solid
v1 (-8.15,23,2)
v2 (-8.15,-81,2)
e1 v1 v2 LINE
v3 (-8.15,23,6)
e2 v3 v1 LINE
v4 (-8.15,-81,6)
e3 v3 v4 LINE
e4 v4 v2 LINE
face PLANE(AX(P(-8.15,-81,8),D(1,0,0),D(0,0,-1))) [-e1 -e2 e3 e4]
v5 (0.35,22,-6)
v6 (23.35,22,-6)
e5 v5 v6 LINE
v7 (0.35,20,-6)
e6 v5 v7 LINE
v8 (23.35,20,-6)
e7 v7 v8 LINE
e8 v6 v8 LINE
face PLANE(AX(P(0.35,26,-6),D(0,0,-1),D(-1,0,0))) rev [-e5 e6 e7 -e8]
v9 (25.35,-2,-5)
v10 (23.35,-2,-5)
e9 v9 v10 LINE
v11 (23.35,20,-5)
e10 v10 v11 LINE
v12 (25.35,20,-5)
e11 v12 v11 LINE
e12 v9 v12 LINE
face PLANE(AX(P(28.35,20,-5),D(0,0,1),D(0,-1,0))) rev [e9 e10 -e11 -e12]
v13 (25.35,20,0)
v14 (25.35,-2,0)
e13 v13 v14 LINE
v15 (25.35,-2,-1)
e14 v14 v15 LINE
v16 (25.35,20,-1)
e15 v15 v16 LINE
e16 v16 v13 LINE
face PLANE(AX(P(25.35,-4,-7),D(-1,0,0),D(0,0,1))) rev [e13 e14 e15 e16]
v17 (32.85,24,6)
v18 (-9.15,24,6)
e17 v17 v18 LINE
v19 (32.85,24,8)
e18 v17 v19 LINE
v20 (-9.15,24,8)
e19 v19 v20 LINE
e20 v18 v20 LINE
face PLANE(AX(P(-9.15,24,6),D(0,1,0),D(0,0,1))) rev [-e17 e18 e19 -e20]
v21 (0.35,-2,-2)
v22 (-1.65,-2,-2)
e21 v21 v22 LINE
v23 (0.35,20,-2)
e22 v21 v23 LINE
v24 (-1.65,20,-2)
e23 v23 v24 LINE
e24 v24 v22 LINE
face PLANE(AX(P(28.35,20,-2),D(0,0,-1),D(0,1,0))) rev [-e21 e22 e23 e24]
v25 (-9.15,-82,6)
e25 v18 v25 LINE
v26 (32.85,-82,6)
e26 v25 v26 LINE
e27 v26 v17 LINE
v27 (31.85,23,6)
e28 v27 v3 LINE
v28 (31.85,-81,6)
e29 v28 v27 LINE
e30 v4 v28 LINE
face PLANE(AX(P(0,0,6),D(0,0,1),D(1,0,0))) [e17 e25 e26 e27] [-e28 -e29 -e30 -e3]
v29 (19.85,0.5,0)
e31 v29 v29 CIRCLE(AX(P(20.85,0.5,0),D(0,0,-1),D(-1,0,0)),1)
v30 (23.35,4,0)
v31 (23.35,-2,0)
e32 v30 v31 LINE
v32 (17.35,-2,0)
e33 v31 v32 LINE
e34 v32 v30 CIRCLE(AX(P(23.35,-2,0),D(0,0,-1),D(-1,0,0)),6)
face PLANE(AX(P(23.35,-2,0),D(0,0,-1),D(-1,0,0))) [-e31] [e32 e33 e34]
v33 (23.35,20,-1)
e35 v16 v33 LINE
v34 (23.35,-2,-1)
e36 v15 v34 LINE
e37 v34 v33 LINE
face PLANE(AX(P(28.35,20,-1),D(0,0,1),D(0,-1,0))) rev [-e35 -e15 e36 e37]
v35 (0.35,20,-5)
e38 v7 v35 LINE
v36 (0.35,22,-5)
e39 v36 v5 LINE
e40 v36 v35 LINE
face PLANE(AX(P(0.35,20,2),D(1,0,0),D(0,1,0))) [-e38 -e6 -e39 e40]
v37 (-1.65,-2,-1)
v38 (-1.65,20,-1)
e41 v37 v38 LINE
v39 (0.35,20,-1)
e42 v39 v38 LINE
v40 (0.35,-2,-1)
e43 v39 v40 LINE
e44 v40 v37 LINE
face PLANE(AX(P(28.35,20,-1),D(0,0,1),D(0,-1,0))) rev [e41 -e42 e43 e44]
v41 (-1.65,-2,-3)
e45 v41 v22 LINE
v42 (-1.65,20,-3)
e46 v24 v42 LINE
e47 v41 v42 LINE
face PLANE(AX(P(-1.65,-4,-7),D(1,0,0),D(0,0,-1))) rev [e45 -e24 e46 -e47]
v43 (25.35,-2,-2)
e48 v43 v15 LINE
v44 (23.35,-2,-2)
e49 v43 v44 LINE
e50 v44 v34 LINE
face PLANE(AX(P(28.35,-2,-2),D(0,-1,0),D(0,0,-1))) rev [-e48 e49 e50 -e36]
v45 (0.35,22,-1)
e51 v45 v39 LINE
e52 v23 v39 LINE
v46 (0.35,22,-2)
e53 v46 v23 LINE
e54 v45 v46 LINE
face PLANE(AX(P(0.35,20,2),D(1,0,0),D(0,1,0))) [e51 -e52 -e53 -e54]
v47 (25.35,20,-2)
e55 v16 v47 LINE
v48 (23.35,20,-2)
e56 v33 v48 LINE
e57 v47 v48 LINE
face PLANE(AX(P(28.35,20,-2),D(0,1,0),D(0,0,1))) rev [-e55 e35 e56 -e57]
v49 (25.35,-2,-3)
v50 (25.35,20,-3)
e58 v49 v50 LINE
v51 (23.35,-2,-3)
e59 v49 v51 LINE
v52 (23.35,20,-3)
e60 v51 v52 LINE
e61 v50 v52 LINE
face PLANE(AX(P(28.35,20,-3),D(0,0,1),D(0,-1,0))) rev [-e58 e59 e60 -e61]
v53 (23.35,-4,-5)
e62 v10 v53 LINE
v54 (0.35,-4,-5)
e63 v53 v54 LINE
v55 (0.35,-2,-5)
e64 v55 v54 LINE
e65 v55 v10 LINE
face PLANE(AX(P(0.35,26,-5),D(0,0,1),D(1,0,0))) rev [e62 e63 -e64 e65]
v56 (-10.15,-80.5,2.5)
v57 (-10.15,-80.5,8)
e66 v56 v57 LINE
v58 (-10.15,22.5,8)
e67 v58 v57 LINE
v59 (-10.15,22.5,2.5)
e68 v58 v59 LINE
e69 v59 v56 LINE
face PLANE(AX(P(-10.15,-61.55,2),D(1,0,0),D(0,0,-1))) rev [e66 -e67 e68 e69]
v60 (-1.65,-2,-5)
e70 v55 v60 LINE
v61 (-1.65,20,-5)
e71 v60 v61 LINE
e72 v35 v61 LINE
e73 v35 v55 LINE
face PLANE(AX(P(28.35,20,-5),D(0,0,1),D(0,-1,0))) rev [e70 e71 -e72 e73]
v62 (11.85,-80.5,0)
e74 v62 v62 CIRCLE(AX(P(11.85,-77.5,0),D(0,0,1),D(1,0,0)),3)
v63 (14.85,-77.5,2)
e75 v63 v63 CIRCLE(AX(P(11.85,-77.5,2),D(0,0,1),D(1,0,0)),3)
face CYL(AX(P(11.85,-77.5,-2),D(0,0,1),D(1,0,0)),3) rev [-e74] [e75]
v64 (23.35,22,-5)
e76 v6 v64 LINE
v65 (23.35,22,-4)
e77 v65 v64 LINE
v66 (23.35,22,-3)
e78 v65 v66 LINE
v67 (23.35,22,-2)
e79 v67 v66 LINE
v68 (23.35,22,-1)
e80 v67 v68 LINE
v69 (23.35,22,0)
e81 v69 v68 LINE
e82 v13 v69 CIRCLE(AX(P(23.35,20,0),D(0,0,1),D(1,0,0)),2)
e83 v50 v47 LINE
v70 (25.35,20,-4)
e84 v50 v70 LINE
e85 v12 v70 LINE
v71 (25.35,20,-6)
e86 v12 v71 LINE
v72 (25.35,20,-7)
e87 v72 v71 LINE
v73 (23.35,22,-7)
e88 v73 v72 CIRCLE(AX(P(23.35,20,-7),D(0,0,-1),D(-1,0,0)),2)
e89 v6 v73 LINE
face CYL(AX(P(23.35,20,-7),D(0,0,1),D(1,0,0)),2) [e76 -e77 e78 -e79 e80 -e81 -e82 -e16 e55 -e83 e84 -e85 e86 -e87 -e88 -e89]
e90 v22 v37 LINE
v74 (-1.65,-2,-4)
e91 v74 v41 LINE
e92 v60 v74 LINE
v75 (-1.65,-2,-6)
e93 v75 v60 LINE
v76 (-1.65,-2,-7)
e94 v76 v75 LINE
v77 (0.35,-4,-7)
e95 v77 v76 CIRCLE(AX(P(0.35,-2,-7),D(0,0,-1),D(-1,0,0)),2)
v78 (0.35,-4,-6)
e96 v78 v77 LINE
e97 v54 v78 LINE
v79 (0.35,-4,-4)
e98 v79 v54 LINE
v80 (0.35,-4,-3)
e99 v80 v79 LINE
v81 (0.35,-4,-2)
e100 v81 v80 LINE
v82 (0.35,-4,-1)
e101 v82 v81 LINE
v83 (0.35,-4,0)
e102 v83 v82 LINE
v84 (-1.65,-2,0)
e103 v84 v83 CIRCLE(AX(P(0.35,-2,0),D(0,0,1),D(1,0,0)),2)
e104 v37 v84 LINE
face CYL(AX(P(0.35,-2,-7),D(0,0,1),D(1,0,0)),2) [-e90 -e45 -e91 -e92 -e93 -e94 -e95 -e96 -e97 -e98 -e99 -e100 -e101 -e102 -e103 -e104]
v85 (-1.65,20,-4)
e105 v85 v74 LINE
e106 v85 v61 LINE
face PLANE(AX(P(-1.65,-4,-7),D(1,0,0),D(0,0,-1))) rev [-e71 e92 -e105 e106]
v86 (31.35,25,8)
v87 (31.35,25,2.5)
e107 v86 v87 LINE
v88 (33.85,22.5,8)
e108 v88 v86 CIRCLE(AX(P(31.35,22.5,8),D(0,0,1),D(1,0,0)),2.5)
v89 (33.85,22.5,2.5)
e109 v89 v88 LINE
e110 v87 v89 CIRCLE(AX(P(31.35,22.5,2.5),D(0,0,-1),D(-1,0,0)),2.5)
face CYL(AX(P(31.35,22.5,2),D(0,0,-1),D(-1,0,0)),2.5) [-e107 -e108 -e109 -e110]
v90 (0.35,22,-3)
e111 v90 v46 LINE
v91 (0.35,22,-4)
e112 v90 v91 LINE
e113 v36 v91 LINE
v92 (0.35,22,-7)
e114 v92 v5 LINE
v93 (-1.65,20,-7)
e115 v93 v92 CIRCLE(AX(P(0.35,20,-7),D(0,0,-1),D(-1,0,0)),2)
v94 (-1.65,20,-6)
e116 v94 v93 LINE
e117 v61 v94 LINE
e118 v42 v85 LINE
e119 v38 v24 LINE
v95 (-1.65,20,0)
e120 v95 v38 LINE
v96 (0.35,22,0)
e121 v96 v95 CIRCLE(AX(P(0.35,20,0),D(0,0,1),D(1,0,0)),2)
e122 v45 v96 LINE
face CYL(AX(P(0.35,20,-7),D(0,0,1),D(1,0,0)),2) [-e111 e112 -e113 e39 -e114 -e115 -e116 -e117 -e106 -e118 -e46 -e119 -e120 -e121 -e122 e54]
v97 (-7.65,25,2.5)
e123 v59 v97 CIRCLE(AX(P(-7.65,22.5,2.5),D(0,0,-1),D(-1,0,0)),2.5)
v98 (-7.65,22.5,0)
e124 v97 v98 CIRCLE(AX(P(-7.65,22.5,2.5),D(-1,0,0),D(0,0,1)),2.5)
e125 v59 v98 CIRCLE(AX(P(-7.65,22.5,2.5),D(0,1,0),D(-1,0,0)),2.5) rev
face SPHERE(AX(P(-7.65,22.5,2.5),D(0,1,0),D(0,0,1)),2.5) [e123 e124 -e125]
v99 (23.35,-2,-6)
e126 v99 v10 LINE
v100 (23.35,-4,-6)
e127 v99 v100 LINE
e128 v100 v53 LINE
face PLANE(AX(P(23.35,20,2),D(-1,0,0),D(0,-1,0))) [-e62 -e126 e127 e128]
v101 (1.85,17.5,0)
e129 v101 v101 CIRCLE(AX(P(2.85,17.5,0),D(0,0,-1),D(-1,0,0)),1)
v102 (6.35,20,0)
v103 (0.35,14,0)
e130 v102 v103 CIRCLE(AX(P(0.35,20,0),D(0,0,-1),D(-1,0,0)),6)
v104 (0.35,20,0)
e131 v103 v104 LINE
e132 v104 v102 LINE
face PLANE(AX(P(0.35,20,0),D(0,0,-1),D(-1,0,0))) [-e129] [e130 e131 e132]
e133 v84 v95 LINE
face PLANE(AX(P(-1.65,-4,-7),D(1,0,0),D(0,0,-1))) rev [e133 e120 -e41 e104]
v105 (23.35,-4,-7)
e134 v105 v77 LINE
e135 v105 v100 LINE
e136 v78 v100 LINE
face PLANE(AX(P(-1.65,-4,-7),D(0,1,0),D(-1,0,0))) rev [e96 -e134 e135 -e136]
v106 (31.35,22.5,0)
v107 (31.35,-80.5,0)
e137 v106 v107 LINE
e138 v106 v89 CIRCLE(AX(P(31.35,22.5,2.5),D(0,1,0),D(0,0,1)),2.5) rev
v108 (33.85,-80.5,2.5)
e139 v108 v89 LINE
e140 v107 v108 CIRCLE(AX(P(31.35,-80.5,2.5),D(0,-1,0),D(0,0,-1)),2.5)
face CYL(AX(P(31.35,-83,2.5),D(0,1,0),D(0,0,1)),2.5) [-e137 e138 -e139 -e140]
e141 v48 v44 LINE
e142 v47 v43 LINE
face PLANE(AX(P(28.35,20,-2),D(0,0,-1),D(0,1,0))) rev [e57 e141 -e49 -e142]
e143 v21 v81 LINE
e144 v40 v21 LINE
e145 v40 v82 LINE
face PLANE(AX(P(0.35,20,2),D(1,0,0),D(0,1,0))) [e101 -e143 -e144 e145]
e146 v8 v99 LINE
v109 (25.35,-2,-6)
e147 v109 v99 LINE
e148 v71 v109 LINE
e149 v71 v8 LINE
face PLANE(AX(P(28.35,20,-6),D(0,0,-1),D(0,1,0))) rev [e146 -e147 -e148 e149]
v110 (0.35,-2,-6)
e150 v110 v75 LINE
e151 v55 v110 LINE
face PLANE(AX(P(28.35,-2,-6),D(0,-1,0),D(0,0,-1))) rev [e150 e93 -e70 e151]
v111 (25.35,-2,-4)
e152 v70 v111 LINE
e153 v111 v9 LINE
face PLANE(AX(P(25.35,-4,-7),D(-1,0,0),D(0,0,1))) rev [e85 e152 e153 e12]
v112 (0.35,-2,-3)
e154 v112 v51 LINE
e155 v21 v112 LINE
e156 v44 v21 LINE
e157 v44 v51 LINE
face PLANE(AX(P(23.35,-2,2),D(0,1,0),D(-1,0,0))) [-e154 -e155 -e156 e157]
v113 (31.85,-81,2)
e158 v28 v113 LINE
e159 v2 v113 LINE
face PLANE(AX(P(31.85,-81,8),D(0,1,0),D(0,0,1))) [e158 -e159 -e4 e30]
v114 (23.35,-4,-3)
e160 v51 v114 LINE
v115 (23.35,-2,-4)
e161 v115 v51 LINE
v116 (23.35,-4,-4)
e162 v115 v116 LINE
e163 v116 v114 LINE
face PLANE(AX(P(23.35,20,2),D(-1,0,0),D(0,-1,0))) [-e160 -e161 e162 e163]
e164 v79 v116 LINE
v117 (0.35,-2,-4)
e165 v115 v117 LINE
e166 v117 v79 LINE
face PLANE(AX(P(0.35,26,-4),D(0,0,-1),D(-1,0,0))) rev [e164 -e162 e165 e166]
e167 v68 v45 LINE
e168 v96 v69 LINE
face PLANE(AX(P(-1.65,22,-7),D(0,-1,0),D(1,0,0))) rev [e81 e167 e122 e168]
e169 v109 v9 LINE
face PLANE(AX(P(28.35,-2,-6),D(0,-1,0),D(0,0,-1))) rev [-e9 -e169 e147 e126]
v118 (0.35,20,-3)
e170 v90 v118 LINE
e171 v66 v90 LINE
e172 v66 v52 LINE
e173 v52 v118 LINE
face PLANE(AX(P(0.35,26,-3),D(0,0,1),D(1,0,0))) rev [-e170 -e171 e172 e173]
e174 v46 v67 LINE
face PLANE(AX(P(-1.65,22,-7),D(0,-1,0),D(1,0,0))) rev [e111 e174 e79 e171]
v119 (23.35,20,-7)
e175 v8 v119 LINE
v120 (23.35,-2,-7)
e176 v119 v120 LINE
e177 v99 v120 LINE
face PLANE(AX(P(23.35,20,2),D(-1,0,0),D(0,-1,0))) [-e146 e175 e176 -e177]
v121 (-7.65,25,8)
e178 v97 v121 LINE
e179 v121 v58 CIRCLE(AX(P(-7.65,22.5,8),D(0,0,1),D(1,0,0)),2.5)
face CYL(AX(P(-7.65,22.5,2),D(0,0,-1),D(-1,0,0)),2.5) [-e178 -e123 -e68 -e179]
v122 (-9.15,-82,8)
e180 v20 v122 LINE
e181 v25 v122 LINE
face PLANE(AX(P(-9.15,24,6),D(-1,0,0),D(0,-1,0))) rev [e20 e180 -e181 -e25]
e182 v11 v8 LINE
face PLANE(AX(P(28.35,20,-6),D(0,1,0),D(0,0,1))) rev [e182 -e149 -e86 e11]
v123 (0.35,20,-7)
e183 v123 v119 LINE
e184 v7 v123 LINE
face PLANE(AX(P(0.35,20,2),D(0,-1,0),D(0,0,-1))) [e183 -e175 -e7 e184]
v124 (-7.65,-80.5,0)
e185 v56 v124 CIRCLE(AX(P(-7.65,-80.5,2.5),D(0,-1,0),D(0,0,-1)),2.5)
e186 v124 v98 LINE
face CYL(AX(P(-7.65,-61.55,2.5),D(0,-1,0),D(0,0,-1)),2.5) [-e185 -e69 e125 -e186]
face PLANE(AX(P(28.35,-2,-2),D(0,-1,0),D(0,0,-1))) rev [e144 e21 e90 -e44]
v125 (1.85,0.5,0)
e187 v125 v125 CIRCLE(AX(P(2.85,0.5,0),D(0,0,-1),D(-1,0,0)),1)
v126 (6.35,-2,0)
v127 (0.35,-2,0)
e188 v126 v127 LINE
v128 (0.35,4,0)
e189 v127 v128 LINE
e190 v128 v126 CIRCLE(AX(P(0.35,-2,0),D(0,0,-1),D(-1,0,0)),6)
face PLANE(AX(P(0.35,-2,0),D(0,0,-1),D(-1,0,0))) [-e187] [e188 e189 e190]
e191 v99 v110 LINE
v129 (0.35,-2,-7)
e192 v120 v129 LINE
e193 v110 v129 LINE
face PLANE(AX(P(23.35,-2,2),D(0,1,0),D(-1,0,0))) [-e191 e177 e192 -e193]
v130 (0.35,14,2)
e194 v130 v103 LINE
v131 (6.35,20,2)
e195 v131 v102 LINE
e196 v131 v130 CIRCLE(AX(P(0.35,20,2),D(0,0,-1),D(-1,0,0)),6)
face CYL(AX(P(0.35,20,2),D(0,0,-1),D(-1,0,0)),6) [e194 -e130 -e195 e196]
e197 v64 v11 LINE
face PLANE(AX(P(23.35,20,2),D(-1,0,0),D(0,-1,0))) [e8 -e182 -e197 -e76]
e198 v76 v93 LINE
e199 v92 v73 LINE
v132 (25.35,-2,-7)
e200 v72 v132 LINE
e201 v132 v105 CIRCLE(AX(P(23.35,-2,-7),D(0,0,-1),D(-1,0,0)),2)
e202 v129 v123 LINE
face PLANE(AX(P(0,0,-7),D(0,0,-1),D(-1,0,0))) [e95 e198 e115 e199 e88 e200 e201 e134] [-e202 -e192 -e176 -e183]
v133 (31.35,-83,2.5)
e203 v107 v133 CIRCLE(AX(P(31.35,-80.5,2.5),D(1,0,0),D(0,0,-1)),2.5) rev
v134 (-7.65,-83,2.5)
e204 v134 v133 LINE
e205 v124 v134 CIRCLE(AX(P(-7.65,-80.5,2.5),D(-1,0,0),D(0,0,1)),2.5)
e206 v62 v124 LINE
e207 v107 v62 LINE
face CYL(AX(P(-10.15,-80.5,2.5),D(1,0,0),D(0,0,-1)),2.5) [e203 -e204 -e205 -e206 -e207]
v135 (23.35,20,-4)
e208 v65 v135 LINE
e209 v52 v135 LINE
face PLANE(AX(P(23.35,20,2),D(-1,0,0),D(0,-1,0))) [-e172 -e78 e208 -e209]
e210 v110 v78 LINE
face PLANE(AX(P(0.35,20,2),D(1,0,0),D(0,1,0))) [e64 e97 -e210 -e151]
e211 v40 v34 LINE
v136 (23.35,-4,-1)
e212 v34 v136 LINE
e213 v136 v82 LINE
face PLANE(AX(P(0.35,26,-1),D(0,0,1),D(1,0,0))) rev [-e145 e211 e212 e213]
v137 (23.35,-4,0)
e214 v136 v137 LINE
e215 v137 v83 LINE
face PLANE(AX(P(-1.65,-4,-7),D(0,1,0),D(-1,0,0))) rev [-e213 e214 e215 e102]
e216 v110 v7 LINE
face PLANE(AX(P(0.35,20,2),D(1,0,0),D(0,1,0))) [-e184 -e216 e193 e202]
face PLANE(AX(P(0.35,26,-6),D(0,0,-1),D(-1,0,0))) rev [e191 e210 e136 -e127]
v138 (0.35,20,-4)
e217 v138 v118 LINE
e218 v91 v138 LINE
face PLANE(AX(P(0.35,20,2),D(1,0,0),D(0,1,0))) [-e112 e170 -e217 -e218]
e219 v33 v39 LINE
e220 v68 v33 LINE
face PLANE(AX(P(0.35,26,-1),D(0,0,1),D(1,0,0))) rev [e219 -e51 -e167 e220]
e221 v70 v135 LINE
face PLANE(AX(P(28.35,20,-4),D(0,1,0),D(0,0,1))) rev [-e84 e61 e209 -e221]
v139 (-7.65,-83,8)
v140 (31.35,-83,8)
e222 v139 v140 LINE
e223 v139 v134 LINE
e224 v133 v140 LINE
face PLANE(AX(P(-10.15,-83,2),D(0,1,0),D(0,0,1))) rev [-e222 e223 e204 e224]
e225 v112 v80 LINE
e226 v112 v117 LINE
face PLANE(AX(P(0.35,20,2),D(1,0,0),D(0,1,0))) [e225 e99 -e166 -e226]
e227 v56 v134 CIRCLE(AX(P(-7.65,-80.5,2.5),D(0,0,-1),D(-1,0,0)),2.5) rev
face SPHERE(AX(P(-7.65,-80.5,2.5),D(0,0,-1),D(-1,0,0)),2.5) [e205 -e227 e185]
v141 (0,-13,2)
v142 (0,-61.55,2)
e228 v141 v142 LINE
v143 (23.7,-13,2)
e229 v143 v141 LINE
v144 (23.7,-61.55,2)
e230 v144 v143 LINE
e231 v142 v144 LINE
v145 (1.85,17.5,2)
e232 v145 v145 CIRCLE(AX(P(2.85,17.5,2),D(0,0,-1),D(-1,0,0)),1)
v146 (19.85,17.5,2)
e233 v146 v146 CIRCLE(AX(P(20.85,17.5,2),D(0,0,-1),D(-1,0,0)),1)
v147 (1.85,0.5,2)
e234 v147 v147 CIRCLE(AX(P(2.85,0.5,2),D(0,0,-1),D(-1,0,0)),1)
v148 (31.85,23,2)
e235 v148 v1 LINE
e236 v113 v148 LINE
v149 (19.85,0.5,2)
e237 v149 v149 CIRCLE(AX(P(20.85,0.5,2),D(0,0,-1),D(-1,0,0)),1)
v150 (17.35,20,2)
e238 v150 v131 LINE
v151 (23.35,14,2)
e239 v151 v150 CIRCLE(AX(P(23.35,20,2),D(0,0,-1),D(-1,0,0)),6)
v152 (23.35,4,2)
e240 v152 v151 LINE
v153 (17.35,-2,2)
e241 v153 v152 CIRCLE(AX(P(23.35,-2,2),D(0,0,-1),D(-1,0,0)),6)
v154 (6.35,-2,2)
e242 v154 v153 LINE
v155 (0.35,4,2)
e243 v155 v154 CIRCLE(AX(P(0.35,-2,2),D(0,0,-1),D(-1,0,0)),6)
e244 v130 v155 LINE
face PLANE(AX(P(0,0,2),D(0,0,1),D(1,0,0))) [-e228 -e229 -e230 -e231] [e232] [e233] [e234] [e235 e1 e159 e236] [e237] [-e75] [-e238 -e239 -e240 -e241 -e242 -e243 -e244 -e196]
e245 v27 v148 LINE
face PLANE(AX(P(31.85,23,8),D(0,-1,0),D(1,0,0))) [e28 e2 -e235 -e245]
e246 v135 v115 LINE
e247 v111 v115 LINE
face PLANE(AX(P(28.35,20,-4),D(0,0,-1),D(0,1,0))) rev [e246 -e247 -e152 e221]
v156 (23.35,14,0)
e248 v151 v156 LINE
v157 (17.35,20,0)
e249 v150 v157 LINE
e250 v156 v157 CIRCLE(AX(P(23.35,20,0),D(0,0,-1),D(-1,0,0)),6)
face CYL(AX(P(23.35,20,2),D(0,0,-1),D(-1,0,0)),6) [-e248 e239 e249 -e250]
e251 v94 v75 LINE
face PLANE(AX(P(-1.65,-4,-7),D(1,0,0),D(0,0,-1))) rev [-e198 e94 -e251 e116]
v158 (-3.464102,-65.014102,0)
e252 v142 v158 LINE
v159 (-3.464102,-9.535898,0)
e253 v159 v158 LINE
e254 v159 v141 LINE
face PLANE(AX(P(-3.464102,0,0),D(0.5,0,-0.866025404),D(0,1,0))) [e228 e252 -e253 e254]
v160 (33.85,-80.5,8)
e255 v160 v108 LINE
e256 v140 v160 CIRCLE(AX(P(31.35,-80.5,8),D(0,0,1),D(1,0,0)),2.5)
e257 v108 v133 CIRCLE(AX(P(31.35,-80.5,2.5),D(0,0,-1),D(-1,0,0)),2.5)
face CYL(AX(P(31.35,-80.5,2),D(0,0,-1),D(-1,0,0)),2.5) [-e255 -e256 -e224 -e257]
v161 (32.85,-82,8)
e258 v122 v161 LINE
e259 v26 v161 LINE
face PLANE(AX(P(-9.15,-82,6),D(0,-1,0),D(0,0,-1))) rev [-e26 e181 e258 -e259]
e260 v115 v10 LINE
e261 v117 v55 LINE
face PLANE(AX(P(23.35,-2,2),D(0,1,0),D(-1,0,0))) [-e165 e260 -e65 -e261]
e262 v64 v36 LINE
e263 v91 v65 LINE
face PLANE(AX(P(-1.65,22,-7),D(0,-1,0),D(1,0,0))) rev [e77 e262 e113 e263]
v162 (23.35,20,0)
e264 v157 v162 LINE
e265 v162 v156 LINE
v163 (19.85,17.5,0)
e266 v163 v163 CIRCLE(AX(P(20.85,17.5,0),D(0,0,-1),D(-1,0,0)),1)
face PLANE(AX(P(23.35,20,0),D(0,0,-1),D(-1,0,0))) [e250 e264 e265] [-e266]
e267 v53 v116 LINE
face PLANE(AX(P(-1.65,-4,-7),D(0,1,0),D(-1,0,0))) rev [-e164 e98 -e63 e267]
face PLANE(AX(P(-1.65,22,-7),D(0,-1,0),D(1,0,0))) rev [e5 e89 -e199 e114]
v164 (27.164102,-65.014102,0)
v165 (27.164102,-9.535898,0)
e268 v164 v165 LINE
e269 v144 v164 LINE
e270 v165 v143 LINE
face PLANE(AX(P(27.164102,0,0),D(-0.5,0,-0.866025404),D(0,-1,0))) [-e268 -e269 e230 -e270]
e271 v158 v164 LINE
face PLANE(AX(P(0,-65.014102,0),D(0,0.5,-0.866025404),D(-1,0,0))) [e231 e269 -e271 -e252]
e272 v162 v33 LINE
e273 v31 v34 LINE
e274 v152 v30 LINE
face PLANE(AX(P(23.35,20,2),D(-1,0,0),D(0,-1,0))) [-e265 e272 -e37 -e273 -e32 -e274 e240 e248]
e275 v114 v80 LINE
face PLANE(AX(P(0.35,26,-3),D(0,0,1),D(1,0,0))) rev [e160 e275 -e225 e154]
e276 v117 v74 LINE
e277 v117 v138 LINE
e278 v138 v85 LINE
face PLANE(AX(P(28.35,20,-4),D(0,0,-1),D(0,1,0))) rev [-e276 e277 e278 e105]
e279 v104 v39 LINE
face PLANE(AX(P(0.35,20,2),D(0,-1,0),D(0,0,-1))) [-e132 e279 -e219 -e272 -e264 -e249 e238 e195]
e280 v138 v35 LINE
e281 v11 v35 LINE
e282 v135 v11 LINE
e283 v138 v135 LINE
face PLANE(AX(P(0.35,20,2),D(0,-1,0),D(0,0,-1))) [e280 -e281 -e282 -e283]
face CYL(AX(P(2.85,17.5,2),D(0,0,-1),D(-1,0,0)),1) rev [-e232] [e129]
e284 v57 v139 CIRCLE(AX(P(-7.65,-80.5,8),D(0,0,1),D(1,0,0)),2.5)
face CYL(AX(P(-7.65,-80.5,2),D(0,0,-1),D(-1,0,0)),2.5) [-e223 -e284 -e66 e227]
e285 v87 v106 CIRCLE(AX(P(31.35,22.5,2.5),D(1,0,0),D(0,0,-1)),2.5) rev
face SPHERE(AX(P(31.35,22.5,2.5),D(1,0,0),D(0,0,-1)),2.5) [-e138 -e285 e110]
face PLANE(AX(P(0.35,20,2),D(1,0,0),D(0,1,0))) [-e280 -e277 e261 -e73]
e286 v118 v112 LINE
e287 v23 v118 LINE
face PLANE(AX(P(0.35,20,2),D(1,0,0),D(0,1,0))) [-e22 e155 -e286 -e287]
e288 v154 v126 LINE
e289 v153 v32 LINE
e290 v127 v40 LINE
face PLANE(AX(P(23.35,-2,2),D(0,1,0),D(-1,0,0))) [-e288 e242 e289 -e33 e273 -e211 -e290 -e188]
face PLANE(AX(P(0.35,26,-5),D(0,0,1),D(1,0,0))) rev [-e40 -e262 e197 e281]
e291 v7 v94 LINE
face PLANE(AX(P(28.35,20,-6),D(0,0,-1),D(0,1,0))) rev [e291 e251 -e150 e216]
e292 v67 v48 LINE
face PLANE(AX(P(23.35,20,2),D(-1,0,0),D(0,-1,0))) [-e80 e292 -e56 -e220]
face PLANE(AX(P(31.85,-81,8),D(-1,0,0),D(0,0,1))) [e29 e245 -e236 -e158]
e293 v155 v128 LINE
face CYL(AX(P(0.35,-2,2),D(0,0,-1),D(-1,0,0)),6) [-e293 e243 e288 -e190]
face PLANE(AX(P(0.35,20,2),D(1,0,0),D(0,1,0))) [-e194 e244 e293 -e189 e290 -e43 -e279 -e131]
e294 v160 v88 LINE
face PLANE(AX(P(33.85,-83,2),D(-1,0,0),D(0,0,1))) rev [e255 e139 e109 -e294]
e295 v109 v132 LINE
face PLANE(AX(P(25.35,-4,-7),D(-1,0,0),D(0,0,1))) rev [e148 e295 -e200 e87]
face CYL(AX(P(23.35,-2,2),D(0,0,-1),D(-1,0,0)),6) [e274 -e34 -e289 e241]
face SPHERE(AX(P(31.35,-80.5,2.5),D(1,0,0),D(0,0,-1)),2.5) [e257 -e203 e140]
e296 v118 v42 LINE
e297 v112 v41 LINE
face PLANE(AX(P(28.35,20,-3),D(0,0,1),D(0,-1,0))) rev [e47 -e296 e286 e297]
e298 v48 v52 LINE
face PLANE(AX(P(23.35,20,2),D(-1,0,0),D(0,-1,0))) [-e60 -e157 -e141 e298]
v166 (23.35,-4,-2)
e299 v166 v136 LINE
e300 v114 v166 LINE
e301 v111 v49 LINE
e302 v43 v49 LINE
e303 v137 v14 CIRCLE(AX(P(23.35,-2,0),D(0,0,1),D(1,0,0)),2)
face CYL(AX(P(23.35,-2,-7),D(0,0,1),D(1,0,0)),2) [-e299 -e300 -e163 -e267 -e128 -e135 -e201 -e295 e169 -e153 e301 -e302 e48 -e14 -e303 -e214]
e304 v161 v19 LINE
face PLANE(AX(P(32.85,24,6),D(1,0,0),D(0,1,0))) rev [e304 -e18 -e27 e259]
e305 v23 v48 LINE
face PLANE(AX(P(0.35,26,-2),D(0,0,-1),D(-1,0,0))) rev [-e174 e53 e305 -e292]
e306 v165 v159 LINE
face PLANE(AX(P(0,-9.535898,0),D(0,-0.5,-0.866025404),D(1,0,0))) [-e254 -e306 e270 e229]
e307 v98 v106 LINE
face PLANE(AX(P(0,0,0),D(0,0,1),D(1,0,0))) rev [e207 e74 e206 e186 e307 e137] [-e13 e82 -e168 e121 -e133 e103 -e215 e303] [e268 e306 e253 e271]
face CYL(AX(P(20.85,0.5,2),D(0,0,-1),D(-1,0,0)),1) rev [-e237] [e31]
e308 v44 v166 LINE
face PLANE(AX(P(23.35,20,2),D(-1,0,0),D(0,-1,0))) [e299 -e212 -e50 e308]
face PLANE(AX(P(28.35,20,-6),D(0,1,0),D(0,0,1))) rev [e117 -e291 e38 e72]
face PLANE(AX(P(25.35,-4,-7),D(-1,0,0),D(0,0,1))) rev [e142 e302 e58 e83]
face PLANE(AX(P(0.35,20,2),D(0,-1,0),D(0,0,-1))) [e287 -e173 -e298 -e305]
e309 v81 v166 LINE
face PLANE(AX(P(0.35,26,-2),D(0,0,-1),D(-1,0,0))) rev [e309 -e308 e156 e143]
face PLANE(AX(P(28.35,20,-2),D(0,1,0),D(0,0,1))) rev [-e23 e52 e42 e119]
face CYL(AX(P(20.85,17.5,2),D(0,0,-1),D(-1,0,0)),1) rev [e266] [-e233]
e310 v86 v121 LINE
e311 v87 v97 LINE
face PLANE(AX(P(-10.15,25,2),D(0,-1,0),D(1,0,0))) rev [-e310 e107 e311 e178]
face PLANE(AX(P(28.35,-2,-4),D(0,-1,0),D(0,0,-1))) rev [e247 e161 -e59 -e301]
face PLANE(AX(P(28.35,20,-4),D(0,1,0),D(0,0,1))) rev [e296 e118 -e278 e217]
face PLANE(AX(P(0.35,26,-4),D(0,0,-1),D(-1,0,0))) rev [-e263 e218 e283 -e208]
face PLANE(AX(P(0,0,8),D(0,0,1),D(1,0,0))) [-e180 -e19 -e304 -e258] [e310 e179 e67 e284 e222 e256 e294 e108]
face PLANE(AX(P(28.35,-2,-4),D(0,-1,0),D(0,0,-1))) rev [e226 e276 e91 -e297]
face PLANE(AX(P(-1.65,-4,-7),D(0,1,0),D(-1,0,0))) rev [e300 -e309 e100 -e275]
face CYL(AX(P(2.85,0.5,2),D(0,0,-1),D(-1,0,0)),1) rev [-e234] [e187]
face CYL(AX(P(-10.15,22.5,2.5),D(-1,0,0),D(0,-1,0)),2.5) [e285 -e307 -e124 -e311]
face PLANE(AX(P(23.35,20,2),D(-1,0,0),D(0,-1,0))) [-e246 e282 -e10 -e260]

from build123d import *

# Parameters (mm, degrees)
SKICA1_W                 = 23.7
SKICA1_H                 = 48.55
SKICA1_W_2               = 23
SKICA1_H_2               = 22
P_IDAT_VYSUNUT_M1_DEPTH  = 2
SKICA3_R                 = 3
ODEBRAT_VYSUNUT_M1_DEPTH = 4
ZKOSEN_1_SIZE            = 3.464101615
ZKOSEN_1_SIZE_2          = 2
SKICA5_W                 = 44
SKICA5_H                 = 108
SKICA5_W_2               = 40
SKICA5_H_2               = 104
P_IDAT_VYSUNUT_M3_DEPTH  = 6
ZAOBLIT2_R               = 2.5
SKICA6_W                 = 27
SKICA6_H                 = 26
SKICA6_W_2               = 23
SKICA6_H_2               = 22
P_IDAT_VYSUNUT_M4_DEPTH  = 7
SKICA7_R                 = 1
P_IDAT_VYSUNUT_M5_DEPTH  = 2
SKICA8_W                 = 23
SKICA8_H                 = 1
ODEBRAT_VYSUNUT_M3_DEPTH = 30
SKICA9_W                 = 1
SKICA9_H                 = 22
ODEBRAT_VYSUNUT_M4_DEPTH = 30
ZAOBLIT3_R               = 2
SKICA10_W                = 42
SKICA10_H                = 106
SKICA10_W_2              = 40
SKICA10_H_2              = 104
ODEBRAT_VYSUNUT_M5_DEPTH = 2


# Some blends are built 0.0001 mm under size
with BuildPart() as part:
    # Skica1 → Přidat vysunutím1 (new body)
    with BuildSketch(Plane.XY):
        Polygon((-10.15, 2), (-10.15, 25), (33.85, 25), (33.85, 2), (33.85, -83), (-10.15, -83), (-10.15, -61.55), align=None)
        with Locations((11.85, -37.275)):
            Rectangle(SKICA1_W, SKICA1_H, mode=Mode.SUBTRACT)
        with Locations((11.85, 9)):
            Rectangle(SKICA1_W_2, SKICA1_H_2, mode=Mode.SUBTRACT)
    extrude(amount=P_IDAT_VYSUNUT_M1_DEPTH)

    # Skica3 → Odebrat vysunutím1 (cut)
    with BuildSketch(Plane.XY.offset(2)):
        with Locations((11.85, -77.5)):
            Circle(SKICA3_R)
    extrude(amount=-ODEBRAT_VYSUNUT_M1_DEPTH, mode=Mode.SUBTRACT)

    # Zkosení1
    # the kernel refuses this chamfer: 3.464101615, 2 mm, written as the material it takes off along each edge
    with BuildSketch(Plane(origin=(0, -13, 0), x_dir=(-0.9998132206222079, 0, -0.019326765612700626), z_dir=(0, -1, 0)), Plane(origin=(23.7, -61.55, 0), x_dir=(0.9998132206222079, 0, -0.019326765612700608), z_dir=(0, 1, 0))) as zkosen_1_piece_1:
        Polygon((ZKOSEN_1_SIZE * 0.999813220662, -ZKOSEN_1_SIZE * 0.0193267656135), (-ZKOSEN_1_SIZE_2 * 0.0193267656127, -ZKOSEN_1_SIZE_2 * 0.999813220622), (0, 0), align=None)
    extrude(amount=48.55, mode=Mode.SUBTRACT)
    with BuildSketch(Plane(origin=(0, -61.55, 0), x_dir=(0, -0.9998132206222079, -0.01932676561270056), z_dir=(1, 0, 0)), Plane(origin=(23.7, -13, 0), x_dir=(0, 0.9998132206222079, -0.019326765612700643), z_dir=(-1, 0, 0))) as zkosen_1_piece_2:
        Polygon((ZKOSEN_1_SIZE * 0.999813220662, -ZKOSEN_1_SIZE * 0.0193267656135), (-ZKOSEN_1_SIZE_2 * 0.0193267656127, -ZKOSEN_1_SIZE_2 * 0.999813220622), (0, 0), align=None)
    extrude(amount=23.7, mode=Mode.SUBTRACT)
    with BuildSketch(Plane(origin=(0, -4.038072059, 0), x_dir=(-0.9998132206222079, 0, -0.019326765612700622), z_dir=(0, -1, 0))) as zkosen_1_piece_3a_section:
        Polygon((ZKOSEN_1_SIZE * 0.999813220662, -ZKOSEN_1_SIZE * 0.0193267656135), (-ZKOSEN_1_SIZE_2 * 0.0193267656127, -ZKOSEN_1_SIZE_2 * 0.999813220622), (0, 0), align=None)
    zkosen_1_piece_3a = extrude(amount=57.511927941, mode=Mode.PRIVATE)
    zkosen_1_piece_3a = split(zkosen_1_piece_3a, bisect_by=Plane(origin=(-1.161798269, -13, 0.64133979), z_dir=(0, 1, 0)), keep=Keep.TOP, mode=Mode.PRIVATE)
    with BuildSketch(Plane(origin=(23.7, -13, 0), x_dir=(0, 0.9998132206222079, -0.019326765612700643), z_dir=(-1, 0, 0))) as zkosen_1_piece_3b_section:
        Polygon((ZKOSEN_1_SIZE * 0.999813220662, -ZKOSEN_1_SIZE * 0.0193267656135), (-ZKOSEN_1_SIZE_2 * 0.0193267656127, -ZKOSEN_1_SIZE_2 * 0.999813220622), (0, 0), align=None)
    zkosen_1_piece_3b = extrude(amount=32.661927941, mode=Mode.PRIVATE)
    zkosen_1_piece_3b = split(zkosen_1_piece_3b, bisect_by=Plane(origin=(0, -11.838201731, 0.64133979), z_dir=(-1, 0, 0)), keep=Keep.TOP, mode=Mode.PRIVATE)
    zkosen_1_piece_3 = zkosen_1_piece_3a & zkosen_1_piece_3b
    add(zkosen_1_piece_3, mode=Mode.SUBTRACT)
    with BuildSketch(Plane(origin=(0, -13, 0), x_dir=(-0.9998132206222079, 0, -0.019326765612700626), z_dir=(0, -1, 0))) as zkosen_1_piece_4a_section:
        Polygon((ZKOSEN_1_SIZE * 0.999813220662, -ZKOSEN_1_SIZE * 0.0193267656135), (-ZKOSEN_1_SIZE_2 * 0.0193267656127, -ZKOSEN_1_SIZE_2 * 0.999813220622), (0, 0), align=None)
    zkosen_1_piece_4a = extrude(amount=57.511927941, mode=Mode.PRIVATE)
    zkosen_1_piece_4a = split(zkosen_1_piece_4a, bisect_by=Plane(origin=(-1.161798269, -61.55, 0.64133979), z_dir=(0, -1, 0)), keep=Keep.TOP, mode=Mode.PRIVATE)
    with BuildSketch(Plane(origin=(-8.961927941, -61.55, 0), x_dir=(0, -0.9998132206222079, -0.01932676561270056), z_dir=(1, 0, 0))) as zkosen_1_piece_4b_section:
        Polygon((ZKOSEN_1_SIZE * 0.999813220662, -ZKOSEN_1_SIZE * 0.0193267656135), (-ZKOSEN_1_SIZE_2 * 0.0193267656127, -ZKOSEN_1_SIZE_2 * 0.999813220622), (0, 0), align=None)
    zkosen_1_piece_4b = extrude(amount=32.661927941, mode=Mode.PRIVATE)
    zkosen_1_piece_4b = split(zkosen_1_piece_4b, bisect_by=Plane(origin=(0, -62.711798269, 0.64133979), z_dir=(-1, 0, 0)), keep=Keep.TOP, mode=Mode.PRIVATE)
    zkosen_1_piece_4 = zkosen_1_piece_4a & zkosen_1_piece_4b
    add(zkosen_1_piece_4, mode=Mode.SUBTRACT)
    with BuildSketch(Plane(origin=(0, -61.55, 0), x_dir=(0, -0.9998132206222079, -0.01932676561270056), z_dir=(1, 0, 0))) as zkosen_1_piece_5a_section:
        Polygon((ZKOSEN_1_SIZE * 0.999813220662, -ZKOSEN_1_SIZE * 0.0193267656135), (-ZKOSEN_1_SIZE_2 * 0.0193267656127, -ZKOSEN_1_SIZE_2 * 0.999813220622), (0, 0), align=None)
    zkosen_1_piece_5a = extrude(amount=32.661927941, mode=Mode.PRIVATE)
    zkosen_1_piece_5a = split(zkosen_1_piece_5a, bisect_by=Plane(origin=(23.7, -62.711798269, 0.64133979), z_dir=(1, 0, 0)), keep=Keep.TOP, mode=Mode.PRIVATE)
    with BuildSketch(Plane(origin=(23.7, -70.511927941, 0), x_dir=(0.9998132206222079, 0, -0.019326765612700608), z_dir=(0, 1, 0))) as zkosen_1_piece_5b_section:
        Polygon((ZKOSEN_1_SIZE * 0.999813220662, -ZKOSEN_1_SIZE * 0.0193267656135), (-ZKOSEN_1_SIZE_2 * 0.0193267656127, -ZKOSEN_1_SIZE_2 * 0.999813220622), (0, 0), align=None)
    zkosen_1_piece_5b = extrude(amount=57.511927941, mode=Mode.PRIVATE)
    zkosen_1_piece_5b = split(zkosen_1_piece_5b, bisect_by=Plane(origin=(24.861798269, -61.55, 0.64133979), z_dir=(0, -1, 0)), keep=Keep.TOP, mode=Mode.PRIVATE)
    zkosen_1_piece_5 = zkosen_1_piece_5a & zkosen_1_piece_5b
    add(zkosen_1_piece_5, mode=Mode.SUBTRACT)
    with BuildSketch(Plane(origin=(32.661927941, -13, 0), x_dir=(0, 0.9998132206222079, -0.019326765612700643), z_dir=(-1, 0, 0))) as zkosen_1_piece_6a_section:
        Polygon((ZKOSEN_1_SIZE * 0.999813220662, -ZKOSEN_1_SIZE * 0.0193267656135), (-ZKOSEN_1_SIZE_2 * 0.0193267656127, -ZKOSEN_1_SIZE_2 * 0.999813220622), (0, 0), align=None)
    zkosen_1_piece_6a = extrude(amount=32.661927941, mode=Mode.PRIVATE)
    zkosen_1_piece_6a = split(zkosen_1_piece_6a, bisect_by=Plane(origin=(23.7, -11.838201731, 0.64133979), z_dir=(1, 0, 0)), keep=Keep.TOP, mode=Mode.PRIVATE)
    with BuildSketch(Plane(origin=(23.7, -61.55, 0), x_dir=(0.9998132206222079, 0, -0.019326765612700608), z_dir=(0, 1, 0))) as zkosen_1_piece_6b_section:
        Polygon((ZKOSEN_1_SIZE * 0.999813220662, -ZKOSEN_1_SIZE * 0.0193267656135), (-ZKOSEN_1_SIZE_2 * 0.0193267656127, -ZKOSEN_1_SIZE_2 * 0.999813220622), (0, 0), align=None)
    zkosen_1_piece_6b = extrude(amount=57.511927941, mode=Mode.PRIVATE)
    zkosen_1_piece_6b = split(zkosen_1_piece_6b, bisect_by=Plane(origin=(24.861798269, -13, 0.64133979), z_dir=(0, 1, 0)), keep=Keep.TOP, mode=Mode.PRIVATE)
    zkosen_1_piece_6 = zkosen_1_piece_6a & zkosen_1_piece_6b
    add(zkosen_1_piece_6, mode=Mode.SUBTRACT)

    # Skica5 → Přidat vysunutím3 (add)
    with BuildSketch(Plane.XY.offset(2)):
        with Locations((11.85, -29)):
            Rectangle(SKICA5_W, SKICA5_H)
        with Locations((11.85, -29)):
            Rectangle(SKICA5_W_2, SKICA5_H_2, mode=Mode.SUBTRACT)
    extrude(amount=P_IDAT_VYSUNUT_M3_DEPTH)

    # Zaoblit2
    zaoblit2_edges = [part.edges().sort_by_distance(p)[0] for p in [
        (33.85, -83, 4),
        (-10.15, -83, 4),
        (-10.15, 25, 4),
        (33.85, 25, 4),
        (33.85, -29, 0),
        (11.85, -83, 0),
        (-10.15, -29, 0),
        (11.85, 25, 0),
    ]]
    fillet(zaoblit2_edges, radius=ZAOBLIT2_R - 0.0001)  # a hair under: the kernel refuses the full size

    # Skica6 → Přidat vysunutím4 (add)
    with BuildSketch(Plane(origin=(0, 0, 0), x_dir=(-1, 0, 0), z_dir=(0, 0, -1))):
        with Locations((-11.85, 9)):
            Rectangle(SKICA6_W, SKICA6_H)
        with Locations((-11.85, 9)):
            Rectangle(SKICA6_W_2, SKICA6_H_2, mode=Mode.SUBTRACT)
    extrude(amount=P_IDAT_VYSUNUT_M4_DEPTH)

    # Skica7 → Přidat vysunutím5 (add)
    # profile 1 of 4: a face of its own
    with BuildSketch(Plane(origin=(0, 0, 0), x_dir=(-1, 0, 0), z_dir=(0, 0, -1))):
        with BuildLine():
            Line((-23.35, -2), (-23.35, 4))
            ThreePointArc((-23.35, 4), (-19.107359313, 2.242640687), (-17.35, -2))
            Line((-17.35, -2), (-23.35, -2))
        make_face()
        with Locations((-20.85, 0.5)):
            Circle(SKICA7_R, mode=Mode.SUBTRACT)
    # profile 2 of 4: a face of its own
    with BuildSketch(Plane(origin=(0, 0, 0), x_dir=(-1, 0, 0), z_dir=(0, 0, -1))):
        with BuildLine():
            Line((-0.35, 20), (-6.35, 20))
            ThreePointArc((-6.35, 20), (-4.592640687, 15.757359313), (-0.35, 14))
            Line((-0.35, 14), (-0.35, 20))
        make_face()
        with Locations((-2.85, 17.5)):
            Circle(SKICA7_R, mode=Mode.SUBTRACT)
    # profile 3 of 4: a face of its own
    with BuildSketch(Plane(origin=(0, 0, 0), x_dir=(-1, 0, 0), z_dir=(0, 0, -1))):
        with BuildLine():
            Line((-0.35, -2), (-0.35, 4))
            ThreePointArc((-0.35, 4), (-4.592640687, 2.242640687), (-6.35, -2))
            Line((-6.35, -2), (-0.35, -2))
        make_face()
        with Locations((-2.85, 0.5)):
            Circle(SKICA7_R, mode=Mode.SUBTRACT)
    # profile 4 of 4: a face of its own
    with BuildSketch(Plane(origin=(0, 0, 0), x_dir=(-1, 0, 0), z_dir=(0, 0, -1))):
        with BuildLine():
            Line((-23.35, 20), (-23.35, 14))
            ThreePointArc((-23.35, 14), (-19.107359313, 15.757359313), (-17.35, 20))
            Line((-17.35, 20), (-23.35, 20))
        make_face()
        with Locations((-20.85, 17.5)):
            Circle(SKICA7_R, mode=Mode.SUBTRACT)
    extrude(amount=-P_IDAT_VYSUNUT_M5_DEPTH)

    # Skica8 → Odebrat vysunutím3 (cut)
    with BuildSketch(Plane.XZ.offset(4)):
        with Locations((11.85, -5.5)):
            Rectangle(SKICA8_W, SKICA8_H)
        with Locations((11.85, -3.5)):
            Rectangle(SKICA8_W, SKICA8_H)
        with Locations((11.85, -1.5)):
            Rectangle(SKICA8_W, SKICA8_H)
    extrude(amount=-ODEBRAT_VYSUNUT_M3_DEPTH, mode=Mode.SUBTRACT)

    # Skica9 → Odebrat vysunutím4 (cut)
    with BuildSketch(Plane.ZY.offset(1.65)):
        with Locations((-5.5, 9)):
            Rectangle(SKICA9_W, SKICA9_H)
        with Locations((-3.5, 9)):
            Rectangle(SKICA9_W, SKICA9_H)
        with Locations((-1.5, 9)):
            Rectangle(SKICA9_W, SKICA9_H)
    extrude(amount=-ODEBRAT_VYSUNUT_M4_DEPTH, mode=Mode.SUBTRACT)

    # Zaoblit3
    zaoblit3_edges = [part.edges().sort_by_distance(p)[0] for p in [
        (-1.65, -4, -3.5),
        (-1.65, 22, -3.5),
        (25.35, 22, -3.5),
        (25.35, -4, -3.5),
    ]]
    fillet(zaoblit3_edges, radius=ZAOBLIT3_R - 0.0001)  # a hair under: the kernel refuses the full size

    # Skica10 → Odebrat vysunutím5 (cut)
    with BuildSketch(Plane.XY.offset(8)):
        with Locations((11.85, -29)):
            Rectangle(SKICA10_W, SKICA10_H)
        with Locations((11.85, -29)):
            Rectangle(SKICA10_W_2, SKICA10_H_2, mode=Mode.SUBTRACT)
    extrude(amount=-ODEBRAT_VYSUNUT_M5_DEPTH, mode=Mode.SUBTRACT)


solid = part.part
